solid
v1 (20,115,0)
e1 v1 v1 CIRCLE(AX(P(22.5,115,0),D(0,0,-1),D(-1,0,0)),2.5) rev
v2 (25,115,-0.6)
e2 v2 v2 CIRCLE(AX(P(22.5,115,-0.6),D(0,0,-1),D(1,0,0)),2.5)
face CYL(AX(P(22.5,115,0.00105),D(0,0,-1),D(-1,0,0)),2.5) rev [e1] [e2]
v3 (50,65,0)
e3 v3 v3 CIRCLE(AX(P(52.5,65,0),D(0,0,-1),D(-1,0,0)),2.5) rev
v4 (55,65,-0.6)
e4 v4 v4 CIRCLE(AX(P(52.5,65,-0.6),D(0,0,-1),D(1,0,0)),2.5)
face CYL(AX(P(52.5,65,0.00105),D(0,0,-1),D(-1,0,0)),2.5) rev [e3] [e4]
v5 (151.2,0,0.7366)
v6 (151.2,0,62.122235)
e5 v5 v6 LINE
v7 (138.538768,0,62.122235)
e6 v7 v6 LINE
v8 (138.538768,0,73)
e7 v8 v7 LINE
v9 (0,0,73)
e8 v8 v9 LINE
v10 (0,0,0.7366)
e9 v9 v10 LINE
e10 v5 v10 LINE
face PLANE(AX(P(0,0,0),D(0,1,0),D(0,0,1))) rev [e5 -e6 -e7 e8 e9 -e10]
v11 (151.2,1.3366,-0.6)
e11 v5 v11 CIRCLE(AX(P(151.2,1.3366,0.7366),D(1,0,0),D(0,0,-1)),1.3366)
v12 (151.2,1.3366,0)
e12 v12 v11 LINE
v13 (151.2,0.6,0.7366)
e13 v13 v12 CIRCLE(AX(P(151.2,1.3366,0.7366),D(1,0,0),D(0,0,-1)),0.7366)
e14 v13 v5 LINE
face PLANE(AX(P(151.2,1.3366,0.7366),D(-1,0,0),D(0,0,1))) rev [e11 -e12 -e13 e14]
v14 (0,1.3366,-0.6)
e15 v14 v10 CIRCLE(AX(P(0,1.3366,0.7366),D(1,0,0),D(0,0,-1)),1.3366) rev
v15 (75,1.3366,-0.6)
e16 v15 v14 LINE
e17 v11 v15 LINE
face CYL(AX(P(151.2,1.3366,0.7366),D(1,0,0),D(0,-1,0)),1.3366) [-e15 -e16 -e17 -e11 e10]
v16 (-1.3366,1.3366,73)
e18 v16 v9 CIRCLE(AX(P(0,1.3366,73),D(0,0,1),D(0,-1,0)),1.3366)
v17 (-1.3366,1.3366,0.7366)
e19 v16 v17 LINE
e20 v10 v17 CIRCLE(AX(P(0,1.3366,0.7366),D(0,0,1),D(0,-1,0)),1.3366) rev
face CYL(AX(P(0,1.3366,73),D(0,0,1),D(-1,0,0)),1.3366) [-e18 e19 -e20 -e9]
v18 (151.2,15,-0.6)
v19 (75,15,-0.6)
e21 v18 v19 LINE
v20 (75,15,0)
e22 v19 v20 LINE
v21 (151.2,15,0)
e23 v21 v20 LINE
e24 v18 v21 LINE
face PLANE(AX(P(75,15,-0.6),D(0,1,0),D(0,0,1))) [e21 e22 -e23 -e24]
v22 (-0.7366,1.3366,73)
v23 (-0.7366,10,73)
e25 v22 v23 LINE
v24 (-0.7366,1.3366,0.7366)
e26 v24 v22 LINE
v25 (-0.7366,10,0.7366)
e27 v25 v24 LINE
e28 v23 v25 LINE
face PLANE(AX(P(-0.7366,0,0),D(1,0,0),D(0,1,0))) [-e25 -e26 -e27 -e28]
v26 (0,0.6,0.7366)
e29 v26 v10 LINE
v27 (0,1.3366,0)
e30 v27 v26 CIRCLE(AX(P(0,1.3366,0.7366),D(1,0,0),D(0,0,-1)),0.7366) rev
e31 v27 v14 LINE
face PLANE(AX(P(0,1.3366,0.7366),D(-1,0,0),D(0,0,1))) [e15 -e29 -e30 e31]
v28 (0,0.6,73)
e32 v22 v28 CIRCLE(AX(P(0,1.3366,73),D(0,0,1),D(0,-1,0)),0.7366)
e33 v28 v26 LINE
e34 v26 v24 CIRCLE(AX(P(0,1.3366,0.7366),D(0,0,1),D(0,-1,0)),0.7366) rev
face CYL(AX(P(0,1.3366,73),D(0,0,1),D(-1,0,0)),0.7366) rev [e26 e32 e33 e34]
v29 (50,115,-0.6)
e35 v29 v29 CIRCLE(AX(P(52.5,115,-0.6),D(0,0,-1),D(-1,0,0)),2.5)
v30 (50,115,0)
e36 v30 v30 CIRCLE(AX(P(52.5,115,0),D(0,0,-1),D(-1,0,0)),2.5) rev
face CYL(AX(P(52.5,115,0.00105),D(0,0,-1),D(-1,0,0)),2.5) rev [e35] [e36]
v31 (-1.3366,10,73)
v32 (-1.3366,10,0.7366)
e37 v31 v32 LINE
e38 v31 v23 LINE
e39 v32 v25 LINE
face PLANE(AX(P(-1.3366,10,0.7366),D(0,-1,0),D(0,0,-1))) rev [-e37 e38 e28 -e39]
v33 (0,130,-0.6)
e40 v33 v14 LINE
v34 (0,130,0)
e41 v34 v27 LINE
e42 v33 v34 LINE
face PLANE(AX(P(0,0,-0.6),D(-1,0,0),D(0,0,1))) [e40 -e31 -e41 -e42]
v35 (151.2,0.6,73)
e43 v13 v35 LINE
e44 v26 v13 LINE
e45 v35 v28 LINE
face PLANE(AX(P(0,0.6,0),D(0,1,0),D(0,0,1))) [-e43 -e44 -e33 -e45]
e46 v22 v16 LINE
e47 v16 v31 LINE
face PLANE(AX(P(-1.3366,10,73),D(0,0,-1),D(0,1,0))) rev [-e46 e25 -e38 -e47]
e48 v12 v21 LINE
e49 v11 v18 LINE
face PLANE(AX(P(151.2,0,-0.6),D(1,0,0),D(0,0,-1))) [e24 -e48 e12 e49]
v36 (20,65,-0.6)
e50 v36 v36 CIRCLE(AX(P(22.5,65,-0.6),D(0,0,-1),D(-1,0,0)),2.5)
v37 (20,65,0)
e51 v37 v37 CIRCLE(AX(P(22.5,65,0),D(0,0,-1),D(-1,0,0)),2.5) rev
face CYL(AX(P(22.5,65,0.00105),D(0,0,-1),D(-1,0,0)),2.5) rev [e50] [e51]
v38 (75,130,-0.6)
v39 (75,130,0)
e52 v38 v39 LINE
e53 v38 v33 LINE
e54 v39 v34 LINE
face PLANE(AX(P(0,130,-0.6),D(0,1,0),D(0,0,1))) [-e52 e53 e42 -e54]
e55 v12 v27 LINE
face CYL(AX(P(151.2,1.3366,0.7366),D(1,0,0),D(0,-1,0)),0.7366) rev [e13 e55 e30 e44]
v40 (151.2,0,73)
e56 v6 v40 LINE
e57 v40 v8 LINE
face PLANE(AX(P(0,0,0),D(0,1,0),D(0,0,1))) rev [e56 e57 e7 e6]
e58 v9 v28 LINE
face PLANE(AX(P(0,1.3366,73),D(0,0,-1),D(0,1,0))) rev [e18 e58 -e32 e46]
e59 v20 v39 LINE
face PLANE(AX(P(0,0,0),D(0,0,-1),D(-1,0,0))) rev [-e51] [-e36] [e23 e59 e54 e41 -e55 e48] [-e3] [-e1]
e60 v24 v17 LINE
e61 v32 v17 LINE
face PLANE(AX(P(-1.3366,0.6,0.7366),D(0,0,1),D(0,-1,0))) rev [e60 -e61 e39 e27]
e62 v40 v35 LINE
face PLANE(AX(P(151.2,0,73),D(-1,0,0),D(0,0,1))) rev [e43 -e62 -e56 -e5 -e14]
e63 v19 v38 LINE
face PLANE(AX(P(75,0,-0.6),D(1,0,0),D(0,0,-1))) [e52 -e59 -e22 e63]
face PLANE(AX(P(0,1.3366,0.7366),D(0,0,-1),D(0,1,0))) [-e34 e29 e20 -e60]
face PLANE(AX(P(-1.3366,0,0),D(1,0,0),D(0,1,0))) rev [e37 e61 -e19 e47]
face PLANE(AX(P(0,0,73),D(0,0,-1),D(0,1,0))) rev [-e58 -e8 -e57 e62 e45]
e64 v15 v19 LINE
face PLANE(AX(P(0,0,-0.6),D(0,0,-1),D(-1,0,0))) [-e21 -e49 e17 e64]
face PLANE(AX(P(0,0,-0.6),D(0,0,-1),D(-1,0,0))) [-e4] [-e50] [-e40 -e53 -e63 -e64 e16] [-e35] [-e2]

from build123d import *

# Parameters (mm, degrees)
SKETCH2_W                    = 75
SKETCH2_H                    = 130
BASE_FLANGE1_DEPTH           = 0.6
TAB2_START                   = -0.6
TAB2_OUTLINE_W               = 76.2
TAB2_OUTLINE_H               = 15
TAB2_DEPTH                   = 0.6
CUT_EXTRUDE1_REACH           = 201.404
SKETCH10_R                   = 2.5
EDGE_FLANGE1_STRIP_W         = 3.8732
EDGE_FLANGE1_STRIP_H         = 0.6
EDGE_FLANGE1_STRIP_CUT_DEPTH = 151.2
EDGE_FLANGE1_DEPTH           = 151.2
EDGE_FLANGE2_DEPTH           = 72.2634


# Read off the part's stored shape, not the designer's step: Tab2
# Sheet-metal steps are written as plain solids
with BuildPart() as part:
    # Sketch2 → Base-Flange1 (new body)
    with BuildSketch(Plane.XY):
        with Locations((37.5, 65)):
            Rectangle(SKETCH2_W, SKETCH2_H)
    extrude(amount=-BASE_FLANGE1_DEPTH)

    # Tab2 outline → Tab2 (add)
    with BuildSketch(Plane.XY.offset(TAB2_START)):
        with Locations((113.1, 7.5)):
            Rectangle(TAB2_OUTLINE_W, TAB2_OUTLINE_H)
    extrude(amount=TAB2_DEPTH)

    # Sketch10 → Cut-Extrude1 (cut, up to next)
    with BuildSketch(Plane(origin=(0, 0, -0.6), x_dir=(-1, 0, 0), z_dir=(0, 0, -1)), mode=Mode.PRIVATE) as cut_extrude1_sk1:
        with Locations((-22.5, 65)):
            Circle(SKETCH10_R)
    cut_extrude1_tool1 = extrude(cut_extrude1_sk1.sketch, amount=-CUT_EXTRUDE1_REACH, mode=Mode.PRIVATE) & part.part
    # Sketch10 → Cut-Extrude1 (cut, up to next)
    with BuildSketch(Plane(origin=(0, 0, -0.6), x_dir=(-1, 0, 0), z_dir=(0, 0, -1)), mode=Mode.PRIVATE) as cut_extrude1_sk2:
        with Locations((-52.5, 115)):
            Circle(SKETCH10_R)
    cut_extrude1_tool2 = extrude(cut_extrude1_sk2.sketch, amount=-CUT_EXTRUDE1_REACH, mode=Mode.PRIVATE) & part.part
    # Sketch10 → Cut-Extrude1 (cut, up to next)
    with BuildSketch(Plane(origin=(0, 0, -0.6), x_dir=(-1, 0, 0), z_dir=(0, 0, -1)), mode=Mode.PRIVATE) as cut_extrude1_sk3:
        with Locations((-52.5, 65)):
            Circle(SKETCH10_R)
    cut_extrude1_tool3 = extrude(cut_extrude1_sk3.sketch, amount=-CUT_EXTRUDE1_REACH, mode=Mode.PRIVATE) & part.part
    # Sketch10 → Cut-Extrude1 (cut, up to next)
    with BuildSketch(Plane(origin=(0, 0, -0.6), x_dir=(-1, 0, 0), z_dir=(0, 0, -1)), mode=Mode.PRIVATE) as cut_extrude1_sk4:
        with Locations((-22.5, 115)):
            Circle(SKETCH10_R)
    cut_extrude1_tool4 = extrude(cut_extrude1_sk4.sketch, amount=-CUT_EXTRUDE1_REACH, mode=Mode.PRIVATE) & part.part
    add(cut_extrude1_tool1.solids().sort_by_distance((22.5, 65, -0.6))[0], mode=Mode.SUBTRACT)
    add(cut_extrude1_tool2.solids().sort_by_distance((52.5, 115, -0.6))[0], mode=Mode.SUBTRACT)
    add(cut_extrude1_tool3.solids().sort_by_distance((52.5, 65, -0.6))[0], mode=Mode.SUBTRACT)
    add(cut_extrude1_tool4.solids().sort_by_distance((22.5, 115, -0.6))[0], mode=Mode.SUBTRACT)

    # Edge-Flange1 strip (across the edge) → Edge-Flange1 strip cut (cut)
    with BuildSketch(Plane.YZ):
        with Locations((-0.6, -0.3)):
            Rectangle(EDGE_FLANGE1_STRIP_W, EDGE_FLANGE1_STRIP_H)
    extrude(amount=EDGE_FLANGE1_STRIP_CUT_DEPTH, mode=Mode.SUBTRACT)

    # Edge-Flange1 section (across the edge) → Edge-Flange1 (add)
    with BuildSketch(Plane.YZ):
        with BuildLine():
            Line((0, 0.7366), (0, 73))
            Line((0, 73), (0.6, 73))
            Line((0.6, 73), (0.6, 0.7366))
            ThreePointArc((0.6, 0.7366), (0.815745145, 0.215745145), (1.3366, 0))
            Line((1.3366, 0), (1.3366, -0.6))
            ThreePointArc((1.3366, -0.6), (0.391481076, -0.208518924), (0, 0.7366))
        make_face()
    extrude(amount=EDGE_FLANGE1_DEPTH)

    # Edge-Flange2 section (across the edge) → Edge-Flange2 (add)
    with BuildSketch(Plane(origin=(-0.7366, 0.6, 0.7366), x_dir=(1, 0, 0), z_dir=(0, 0, 1))):
        with BuildLine():
            Line((-0.6, 0.7366), (-0.6, 9.4))
            Line((-0.6, 9.4), (0, 9.4))
            Line((0, 9.4), (0, 0.7366))
            ThreePointArc((0, 0.7366), (0.215745145, 0.215745145), (0.7366, 0))
            Line((0.7366, 0), (0.7366, -0.6))
            ThreePointArc((0.7366, -0.6), (-0.208518924, -0.208518924), (-0.6, 0.7366))
        make_face()
    extrude(amount=EDGE_FLANGE2_DEPTH)


solid = part.part
